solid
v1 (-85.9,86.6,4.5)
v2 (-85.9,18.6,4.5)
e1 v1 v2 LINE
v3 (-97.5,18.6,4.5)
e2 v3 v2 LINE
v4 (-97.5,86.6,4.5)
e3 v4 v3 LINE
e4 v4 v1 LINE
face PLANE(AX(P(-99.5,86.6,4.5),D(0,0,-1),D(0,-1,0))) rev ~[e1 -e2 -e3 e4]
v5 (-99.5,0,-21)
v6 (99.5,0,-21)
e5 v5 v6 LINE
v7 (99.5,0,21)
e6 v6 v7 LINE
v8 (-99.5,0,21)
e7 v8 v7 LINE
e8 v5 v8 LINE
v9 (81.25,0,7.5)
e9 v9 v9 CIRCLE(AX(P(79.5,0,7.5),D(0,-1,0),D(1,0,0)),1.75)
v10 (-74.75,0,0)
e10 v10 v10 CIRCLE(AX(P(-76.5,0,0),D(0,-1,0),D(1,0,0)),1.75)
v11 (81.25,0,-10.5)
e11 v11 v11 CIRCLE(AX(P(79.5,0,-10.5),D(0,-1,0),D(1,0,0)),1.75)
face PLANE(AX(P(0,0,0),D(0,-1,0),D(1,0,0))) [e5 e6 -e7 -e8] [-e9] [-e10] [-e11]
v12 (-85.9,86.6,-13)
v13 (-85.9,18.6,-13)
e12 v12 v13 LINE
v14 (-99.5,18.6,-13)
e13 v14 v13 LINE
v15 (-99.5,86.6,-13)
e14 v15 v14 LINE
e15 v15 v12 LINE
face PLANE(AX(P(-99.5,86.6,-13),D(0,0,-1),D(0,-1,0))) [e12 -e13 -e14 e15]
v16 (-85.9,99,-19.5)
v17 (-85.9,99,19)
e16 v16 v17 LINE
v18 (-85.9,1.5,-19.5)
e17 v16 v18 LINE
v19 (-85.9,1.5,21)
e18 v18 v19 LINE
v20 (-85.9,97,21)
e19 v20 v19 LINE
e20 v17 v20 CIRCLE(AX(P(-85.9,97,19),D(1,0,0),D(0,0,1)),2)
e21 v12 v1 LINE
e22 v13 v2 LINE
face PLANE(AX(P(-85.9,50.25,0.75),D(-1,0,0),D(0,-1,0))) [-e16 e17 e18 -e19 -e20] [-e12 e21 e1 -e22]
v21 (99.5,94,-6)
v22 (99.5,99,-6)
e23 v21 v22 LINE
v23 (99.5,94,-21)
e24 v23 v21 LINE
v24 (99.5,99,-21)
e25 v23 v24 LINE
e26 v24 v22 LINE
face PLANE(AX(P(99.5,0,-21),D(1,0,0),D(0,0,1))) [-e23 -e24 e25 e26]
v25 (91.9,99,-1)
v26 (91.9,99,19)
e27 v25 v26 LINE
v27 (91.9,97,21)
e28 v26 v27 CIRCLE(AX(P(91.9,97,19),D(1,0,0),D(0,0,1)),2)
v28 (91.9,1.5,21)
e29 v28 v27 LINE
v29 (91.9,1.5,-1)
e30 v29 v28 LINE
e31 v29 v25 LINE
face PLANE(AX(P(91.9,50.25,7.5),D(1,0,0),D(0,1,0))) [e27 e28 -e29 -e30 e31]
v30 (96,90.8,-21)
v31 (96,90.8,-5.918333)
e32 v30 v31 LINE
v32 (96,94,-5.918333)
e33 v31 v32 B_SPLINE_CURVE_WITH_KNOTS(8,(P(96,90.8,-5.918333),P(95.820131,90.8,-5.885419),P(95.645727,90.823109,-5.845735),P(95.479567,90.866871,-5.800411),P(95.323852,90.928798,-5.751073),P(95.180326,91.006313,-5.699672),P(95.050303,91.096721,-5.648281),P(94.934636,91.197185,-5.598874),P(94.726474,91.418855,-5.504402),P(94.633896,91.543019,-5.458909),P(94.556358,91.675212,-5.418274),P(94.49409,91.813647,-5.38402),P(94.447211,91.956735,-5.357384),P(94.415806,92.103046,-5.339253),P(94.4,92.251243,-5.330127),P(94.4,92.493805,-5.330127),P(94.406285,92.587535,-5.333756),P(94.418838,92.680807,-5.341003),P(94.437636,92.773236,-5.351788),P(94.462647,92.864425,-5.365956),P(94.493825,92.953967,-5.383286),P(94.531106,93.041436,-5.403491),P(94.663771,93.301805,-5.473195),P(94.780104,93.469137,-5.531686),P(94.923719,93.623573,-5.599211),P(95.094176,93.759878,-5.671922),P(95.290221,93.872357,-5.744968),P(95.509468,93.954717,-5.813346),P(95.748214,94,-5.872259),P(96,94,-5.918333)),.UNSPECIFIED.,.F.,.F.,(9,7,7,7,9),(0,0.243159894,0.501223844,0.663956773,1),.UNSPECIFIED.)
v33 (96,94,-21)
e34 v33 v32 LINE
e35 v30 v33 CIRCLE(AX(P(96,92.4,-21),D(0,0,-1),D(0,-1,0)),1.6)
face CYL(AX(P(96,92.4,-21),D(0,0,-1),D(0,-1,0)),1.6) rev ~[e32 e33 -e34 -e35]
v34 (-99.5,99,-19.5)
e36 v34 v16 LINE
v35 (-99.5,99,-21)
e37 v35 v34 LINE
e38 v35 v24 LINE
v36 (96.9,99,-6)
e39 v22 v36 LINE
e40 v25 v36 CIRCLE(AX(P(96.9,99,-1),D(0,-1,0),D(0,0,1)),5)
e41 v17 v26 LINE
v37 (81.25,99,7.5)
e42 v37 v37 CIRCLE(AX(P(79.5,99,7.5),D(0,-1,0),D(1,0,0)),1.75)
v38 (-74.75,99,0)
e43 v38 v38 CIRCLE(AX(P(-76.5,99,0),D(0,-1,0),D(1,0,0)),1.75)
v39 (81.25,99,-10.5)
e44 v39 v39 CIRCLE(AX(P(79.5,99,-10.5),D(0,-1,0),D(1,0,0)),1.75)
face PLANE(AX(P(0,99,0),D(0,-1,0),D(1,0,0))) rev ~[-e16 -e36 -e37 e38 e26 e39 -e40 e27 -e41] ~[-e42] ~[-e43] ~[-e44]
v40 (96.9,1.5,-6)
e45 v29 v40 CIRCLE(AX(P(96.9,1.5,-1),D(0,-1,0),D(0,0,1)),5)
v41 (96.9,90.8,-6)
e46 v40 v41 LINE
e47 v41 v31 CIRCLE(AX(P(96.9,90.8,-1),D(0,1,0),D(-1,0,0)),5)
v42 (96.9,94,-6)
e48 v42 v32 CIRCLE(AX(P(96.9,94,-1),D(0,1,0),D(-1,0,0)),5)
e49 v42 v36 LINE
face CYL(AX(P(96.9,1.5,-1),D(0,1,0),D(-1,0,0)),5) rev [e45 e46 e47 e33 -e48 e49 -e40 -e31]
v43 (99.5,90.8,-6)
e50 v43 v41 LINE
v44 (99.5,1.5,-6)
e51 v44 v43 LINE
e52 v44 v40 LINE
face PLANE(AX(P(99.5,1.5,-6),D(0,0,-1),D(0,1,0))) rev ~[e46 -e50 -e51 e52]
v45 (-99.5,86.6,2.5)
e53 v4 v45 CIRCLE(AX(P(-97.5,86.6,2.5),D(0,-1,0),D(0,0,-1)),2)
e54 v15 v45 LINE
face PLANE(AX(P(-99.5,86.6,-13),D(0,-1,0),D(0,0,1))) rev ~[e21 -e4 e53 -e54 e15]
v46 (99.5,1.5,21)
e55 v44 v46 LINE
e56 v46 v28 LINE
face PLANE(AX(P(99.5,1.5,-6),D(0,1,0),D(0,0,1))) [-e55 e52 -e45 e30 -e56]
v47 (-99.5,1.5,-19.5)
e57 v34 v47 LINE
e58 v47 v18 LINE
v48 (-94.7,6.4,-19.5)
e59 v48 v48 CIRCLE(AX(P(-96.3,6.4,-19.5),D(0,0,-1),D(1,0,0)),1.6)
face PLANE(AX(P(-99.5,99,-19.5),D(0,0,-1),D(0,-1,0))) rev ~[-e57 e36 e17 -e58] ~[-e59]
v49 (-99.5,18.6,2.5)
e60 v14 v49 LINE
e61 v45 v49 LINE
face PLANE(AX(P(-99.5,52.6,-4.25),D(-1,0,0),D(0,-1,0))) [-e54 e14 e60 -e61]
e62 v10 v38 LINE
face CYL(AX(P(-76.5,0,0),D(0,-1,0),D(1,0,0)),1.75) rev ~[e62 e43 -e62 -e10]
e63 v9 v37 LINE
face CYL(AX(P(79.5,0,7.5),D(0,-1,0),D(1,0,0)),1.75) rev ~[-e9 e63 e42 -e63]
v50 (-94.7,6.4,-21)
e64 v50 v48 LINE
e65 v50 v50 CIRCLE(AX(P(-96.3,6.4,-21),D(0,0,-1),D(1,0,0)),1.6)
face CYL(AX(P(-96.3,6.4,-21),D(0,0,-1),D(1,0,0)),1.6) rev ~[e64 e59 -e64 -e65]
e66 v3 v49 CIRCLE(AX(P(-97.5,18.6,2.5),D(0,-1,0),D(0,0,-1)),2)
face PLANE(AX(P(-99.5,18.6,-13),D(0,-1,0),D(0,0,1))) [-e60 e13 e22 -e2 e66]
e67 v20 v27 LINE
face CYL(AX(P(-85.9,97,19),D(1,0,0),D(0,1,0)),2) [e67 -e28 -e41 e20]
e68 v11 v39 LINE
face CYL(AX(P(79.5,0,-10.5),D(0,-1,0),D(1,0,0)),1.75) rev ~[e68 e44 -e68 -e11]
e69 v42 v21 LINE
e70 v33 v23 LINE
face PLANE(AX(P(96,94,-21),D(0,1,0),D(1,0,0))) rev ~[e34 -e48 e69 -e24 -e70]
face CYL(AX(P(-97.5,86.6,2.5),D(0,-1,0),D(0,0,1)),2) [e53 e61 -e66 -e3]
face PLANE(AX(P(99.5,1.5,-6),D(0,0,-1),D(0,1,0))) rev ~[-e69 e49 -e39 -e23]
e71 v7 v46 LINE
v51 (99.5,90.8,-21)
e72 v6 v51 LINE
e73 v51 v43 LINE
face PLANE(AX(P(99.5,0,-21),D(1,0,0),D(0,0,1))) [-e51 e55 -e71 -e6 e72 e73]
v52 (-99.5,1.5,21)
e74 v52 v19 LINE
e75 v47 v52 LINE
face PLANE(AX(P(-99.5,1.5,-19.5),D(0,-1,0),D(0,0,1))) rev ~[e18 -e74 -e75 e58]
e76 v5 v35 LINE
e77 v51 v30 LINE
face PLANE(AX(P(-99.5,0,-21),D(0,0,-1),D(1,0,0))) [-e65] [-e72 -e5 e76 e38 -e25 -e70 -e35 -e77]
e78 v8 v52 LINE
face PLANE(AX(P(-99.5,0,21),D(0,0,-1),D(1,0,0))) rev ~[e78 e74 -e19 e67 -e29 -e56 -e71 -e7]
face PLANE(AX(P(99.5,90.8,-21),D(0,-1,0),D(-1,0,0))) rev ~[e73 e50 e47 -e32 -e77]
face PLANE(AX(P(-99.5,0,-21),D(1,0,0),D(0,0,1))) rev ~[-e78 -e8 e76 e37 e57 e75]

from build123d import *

# Parameters (mm, degrees)
F1_W      = 199
F1_H      = 42
F1_R      = 1.75
F2_DEPTH  = 99
F4_W      = 97.5
F4_H      = 27
F5_DEPTH  = 7.6
F6_R      = 5
F8_W      = 97.5
F8_H      = 40.5
F9_DEPTH  = 13.6
F10_W     = 68
F10_H     = 17.5
F11_DEPTH = 13.6
F12_R     = 2
F13_R     = 2
F15_R     = 1.6
F16_DEPTH = 42.001


# Not quite as in the source:
# - the program builds the solid bodies; features that only make, move or delete a surface that nothing else refers to are left out


with BuildPart() as f2:
    # F1 (on Front) → F2 (new body)
    with BuildSketch(Plane.XZ):
        Rectangle(F1_W, F1_H)
        with Locations((79.5, -10.5)):
            Circle(F1_R, mode=Mode.SUBTRACT)
        with Locations((-76.5, 0)):
            Circle(F1_R, mode=Mode.SUBTRACT)
        with Locations((79.5, 7.5)):
            Circle(F1_R, mode=Mode.SUBTRACT)
    extrude(amount=-F2_DEPTH)

    # F4 (on offset) → F5 (cut)
    with BuildSketch(Plane.YZ.offset(99.5)):
        with Locations((50.25, 7.5)):
            Rectangle(F4_W, F4_H)
    extrude(amount=-F5_DEPTH, mode=Mode.SUBTRACT)

    # F6
    f6_edges = [f2.edges().sort_by_distance(p)[0] for p in [
        (91.9, 50.25, -6),
    ]]
    fillet(f6_edges, radius=F6_R)

    # F8 (on offset) → F9 (cut)
    with BuildSketch(Plane(origin=(-99.5, 0, 0), x_dir=(0, -1, 0), z_dir=(-1, 0, 0))):
        with Locations((-50.25, 0.75)):
            Rectangle(F8_W, F8_H)
    extrude(amount=-F9_DEPTH, mode=Mode.SUBTRACT)

    # F10 (on offset) → F11 (join, through all)
    with BuildSketch(Plane(origin=(-99.5, 0, 0), x_dir=(0, -1, 0), z_dir=(-1, 0, 0))):
        with Locations((-52.6, -4.25)):
            Rectangle(F10_W, F10_H)
    extrude(amount=-F11_DEPTH)

    # F12
    f12_edges = [f2.edges().sort_by_distance(p)[0] for p in [
        (-99.5, 52.6, 4.5),
    ]]
    fillet(f12_edges, radius=F12_R)

    # F13
    f13_edges = [f2.edges().sort_by_distance(p)[0] for p in [
        (3, 99, 21),
    ]]
    fillet(f13_edges, radius=F13_R)

    # F15 (on face) → F16 (cut, through all)
    with BuildSketch(Plane(origin=(0, 0, -21), x_dir=(1, 0, 0), z_dir=(0, 0, -1))):
        with Locations((-96.3, -6.4)):
            Circle(F15_R)
        with BuildLine():
            Line((96, -94), (99.5, -94))
            Line((99.5, -94), (99.5, -90.8))
            Line((99.5, -90.8), (96, -90.8))
            ThreePointArc((96, -90.8), (97.1313708499, -91.2686291501), (97.6, -92.4))
            ThreePointArc((97.6, -92.4), (97.1313708499, -93.5313708499), (96, -94))
        make_face()
        with BuildLine():
            Line((96, -90.8), (96, -94))
            ThreePointArc((96, -94), (97.1313708499, -93.5313708499), (97.6, -92.4))
            ThreePointArc((97.6, -92.4), (97.1313708499, -91.2686291501), (96, -90.8))
        make_face()
        with BuildLine():
            ThreePointArc((96, -90.8), (94.4, -92.4), (96, -94))
            Line((96, -94), (96, -90.8))
        make_face()
    extrude(amount=-F16_DEPTH, mode=Mode.SUBTRACT)


solid = f2.part
